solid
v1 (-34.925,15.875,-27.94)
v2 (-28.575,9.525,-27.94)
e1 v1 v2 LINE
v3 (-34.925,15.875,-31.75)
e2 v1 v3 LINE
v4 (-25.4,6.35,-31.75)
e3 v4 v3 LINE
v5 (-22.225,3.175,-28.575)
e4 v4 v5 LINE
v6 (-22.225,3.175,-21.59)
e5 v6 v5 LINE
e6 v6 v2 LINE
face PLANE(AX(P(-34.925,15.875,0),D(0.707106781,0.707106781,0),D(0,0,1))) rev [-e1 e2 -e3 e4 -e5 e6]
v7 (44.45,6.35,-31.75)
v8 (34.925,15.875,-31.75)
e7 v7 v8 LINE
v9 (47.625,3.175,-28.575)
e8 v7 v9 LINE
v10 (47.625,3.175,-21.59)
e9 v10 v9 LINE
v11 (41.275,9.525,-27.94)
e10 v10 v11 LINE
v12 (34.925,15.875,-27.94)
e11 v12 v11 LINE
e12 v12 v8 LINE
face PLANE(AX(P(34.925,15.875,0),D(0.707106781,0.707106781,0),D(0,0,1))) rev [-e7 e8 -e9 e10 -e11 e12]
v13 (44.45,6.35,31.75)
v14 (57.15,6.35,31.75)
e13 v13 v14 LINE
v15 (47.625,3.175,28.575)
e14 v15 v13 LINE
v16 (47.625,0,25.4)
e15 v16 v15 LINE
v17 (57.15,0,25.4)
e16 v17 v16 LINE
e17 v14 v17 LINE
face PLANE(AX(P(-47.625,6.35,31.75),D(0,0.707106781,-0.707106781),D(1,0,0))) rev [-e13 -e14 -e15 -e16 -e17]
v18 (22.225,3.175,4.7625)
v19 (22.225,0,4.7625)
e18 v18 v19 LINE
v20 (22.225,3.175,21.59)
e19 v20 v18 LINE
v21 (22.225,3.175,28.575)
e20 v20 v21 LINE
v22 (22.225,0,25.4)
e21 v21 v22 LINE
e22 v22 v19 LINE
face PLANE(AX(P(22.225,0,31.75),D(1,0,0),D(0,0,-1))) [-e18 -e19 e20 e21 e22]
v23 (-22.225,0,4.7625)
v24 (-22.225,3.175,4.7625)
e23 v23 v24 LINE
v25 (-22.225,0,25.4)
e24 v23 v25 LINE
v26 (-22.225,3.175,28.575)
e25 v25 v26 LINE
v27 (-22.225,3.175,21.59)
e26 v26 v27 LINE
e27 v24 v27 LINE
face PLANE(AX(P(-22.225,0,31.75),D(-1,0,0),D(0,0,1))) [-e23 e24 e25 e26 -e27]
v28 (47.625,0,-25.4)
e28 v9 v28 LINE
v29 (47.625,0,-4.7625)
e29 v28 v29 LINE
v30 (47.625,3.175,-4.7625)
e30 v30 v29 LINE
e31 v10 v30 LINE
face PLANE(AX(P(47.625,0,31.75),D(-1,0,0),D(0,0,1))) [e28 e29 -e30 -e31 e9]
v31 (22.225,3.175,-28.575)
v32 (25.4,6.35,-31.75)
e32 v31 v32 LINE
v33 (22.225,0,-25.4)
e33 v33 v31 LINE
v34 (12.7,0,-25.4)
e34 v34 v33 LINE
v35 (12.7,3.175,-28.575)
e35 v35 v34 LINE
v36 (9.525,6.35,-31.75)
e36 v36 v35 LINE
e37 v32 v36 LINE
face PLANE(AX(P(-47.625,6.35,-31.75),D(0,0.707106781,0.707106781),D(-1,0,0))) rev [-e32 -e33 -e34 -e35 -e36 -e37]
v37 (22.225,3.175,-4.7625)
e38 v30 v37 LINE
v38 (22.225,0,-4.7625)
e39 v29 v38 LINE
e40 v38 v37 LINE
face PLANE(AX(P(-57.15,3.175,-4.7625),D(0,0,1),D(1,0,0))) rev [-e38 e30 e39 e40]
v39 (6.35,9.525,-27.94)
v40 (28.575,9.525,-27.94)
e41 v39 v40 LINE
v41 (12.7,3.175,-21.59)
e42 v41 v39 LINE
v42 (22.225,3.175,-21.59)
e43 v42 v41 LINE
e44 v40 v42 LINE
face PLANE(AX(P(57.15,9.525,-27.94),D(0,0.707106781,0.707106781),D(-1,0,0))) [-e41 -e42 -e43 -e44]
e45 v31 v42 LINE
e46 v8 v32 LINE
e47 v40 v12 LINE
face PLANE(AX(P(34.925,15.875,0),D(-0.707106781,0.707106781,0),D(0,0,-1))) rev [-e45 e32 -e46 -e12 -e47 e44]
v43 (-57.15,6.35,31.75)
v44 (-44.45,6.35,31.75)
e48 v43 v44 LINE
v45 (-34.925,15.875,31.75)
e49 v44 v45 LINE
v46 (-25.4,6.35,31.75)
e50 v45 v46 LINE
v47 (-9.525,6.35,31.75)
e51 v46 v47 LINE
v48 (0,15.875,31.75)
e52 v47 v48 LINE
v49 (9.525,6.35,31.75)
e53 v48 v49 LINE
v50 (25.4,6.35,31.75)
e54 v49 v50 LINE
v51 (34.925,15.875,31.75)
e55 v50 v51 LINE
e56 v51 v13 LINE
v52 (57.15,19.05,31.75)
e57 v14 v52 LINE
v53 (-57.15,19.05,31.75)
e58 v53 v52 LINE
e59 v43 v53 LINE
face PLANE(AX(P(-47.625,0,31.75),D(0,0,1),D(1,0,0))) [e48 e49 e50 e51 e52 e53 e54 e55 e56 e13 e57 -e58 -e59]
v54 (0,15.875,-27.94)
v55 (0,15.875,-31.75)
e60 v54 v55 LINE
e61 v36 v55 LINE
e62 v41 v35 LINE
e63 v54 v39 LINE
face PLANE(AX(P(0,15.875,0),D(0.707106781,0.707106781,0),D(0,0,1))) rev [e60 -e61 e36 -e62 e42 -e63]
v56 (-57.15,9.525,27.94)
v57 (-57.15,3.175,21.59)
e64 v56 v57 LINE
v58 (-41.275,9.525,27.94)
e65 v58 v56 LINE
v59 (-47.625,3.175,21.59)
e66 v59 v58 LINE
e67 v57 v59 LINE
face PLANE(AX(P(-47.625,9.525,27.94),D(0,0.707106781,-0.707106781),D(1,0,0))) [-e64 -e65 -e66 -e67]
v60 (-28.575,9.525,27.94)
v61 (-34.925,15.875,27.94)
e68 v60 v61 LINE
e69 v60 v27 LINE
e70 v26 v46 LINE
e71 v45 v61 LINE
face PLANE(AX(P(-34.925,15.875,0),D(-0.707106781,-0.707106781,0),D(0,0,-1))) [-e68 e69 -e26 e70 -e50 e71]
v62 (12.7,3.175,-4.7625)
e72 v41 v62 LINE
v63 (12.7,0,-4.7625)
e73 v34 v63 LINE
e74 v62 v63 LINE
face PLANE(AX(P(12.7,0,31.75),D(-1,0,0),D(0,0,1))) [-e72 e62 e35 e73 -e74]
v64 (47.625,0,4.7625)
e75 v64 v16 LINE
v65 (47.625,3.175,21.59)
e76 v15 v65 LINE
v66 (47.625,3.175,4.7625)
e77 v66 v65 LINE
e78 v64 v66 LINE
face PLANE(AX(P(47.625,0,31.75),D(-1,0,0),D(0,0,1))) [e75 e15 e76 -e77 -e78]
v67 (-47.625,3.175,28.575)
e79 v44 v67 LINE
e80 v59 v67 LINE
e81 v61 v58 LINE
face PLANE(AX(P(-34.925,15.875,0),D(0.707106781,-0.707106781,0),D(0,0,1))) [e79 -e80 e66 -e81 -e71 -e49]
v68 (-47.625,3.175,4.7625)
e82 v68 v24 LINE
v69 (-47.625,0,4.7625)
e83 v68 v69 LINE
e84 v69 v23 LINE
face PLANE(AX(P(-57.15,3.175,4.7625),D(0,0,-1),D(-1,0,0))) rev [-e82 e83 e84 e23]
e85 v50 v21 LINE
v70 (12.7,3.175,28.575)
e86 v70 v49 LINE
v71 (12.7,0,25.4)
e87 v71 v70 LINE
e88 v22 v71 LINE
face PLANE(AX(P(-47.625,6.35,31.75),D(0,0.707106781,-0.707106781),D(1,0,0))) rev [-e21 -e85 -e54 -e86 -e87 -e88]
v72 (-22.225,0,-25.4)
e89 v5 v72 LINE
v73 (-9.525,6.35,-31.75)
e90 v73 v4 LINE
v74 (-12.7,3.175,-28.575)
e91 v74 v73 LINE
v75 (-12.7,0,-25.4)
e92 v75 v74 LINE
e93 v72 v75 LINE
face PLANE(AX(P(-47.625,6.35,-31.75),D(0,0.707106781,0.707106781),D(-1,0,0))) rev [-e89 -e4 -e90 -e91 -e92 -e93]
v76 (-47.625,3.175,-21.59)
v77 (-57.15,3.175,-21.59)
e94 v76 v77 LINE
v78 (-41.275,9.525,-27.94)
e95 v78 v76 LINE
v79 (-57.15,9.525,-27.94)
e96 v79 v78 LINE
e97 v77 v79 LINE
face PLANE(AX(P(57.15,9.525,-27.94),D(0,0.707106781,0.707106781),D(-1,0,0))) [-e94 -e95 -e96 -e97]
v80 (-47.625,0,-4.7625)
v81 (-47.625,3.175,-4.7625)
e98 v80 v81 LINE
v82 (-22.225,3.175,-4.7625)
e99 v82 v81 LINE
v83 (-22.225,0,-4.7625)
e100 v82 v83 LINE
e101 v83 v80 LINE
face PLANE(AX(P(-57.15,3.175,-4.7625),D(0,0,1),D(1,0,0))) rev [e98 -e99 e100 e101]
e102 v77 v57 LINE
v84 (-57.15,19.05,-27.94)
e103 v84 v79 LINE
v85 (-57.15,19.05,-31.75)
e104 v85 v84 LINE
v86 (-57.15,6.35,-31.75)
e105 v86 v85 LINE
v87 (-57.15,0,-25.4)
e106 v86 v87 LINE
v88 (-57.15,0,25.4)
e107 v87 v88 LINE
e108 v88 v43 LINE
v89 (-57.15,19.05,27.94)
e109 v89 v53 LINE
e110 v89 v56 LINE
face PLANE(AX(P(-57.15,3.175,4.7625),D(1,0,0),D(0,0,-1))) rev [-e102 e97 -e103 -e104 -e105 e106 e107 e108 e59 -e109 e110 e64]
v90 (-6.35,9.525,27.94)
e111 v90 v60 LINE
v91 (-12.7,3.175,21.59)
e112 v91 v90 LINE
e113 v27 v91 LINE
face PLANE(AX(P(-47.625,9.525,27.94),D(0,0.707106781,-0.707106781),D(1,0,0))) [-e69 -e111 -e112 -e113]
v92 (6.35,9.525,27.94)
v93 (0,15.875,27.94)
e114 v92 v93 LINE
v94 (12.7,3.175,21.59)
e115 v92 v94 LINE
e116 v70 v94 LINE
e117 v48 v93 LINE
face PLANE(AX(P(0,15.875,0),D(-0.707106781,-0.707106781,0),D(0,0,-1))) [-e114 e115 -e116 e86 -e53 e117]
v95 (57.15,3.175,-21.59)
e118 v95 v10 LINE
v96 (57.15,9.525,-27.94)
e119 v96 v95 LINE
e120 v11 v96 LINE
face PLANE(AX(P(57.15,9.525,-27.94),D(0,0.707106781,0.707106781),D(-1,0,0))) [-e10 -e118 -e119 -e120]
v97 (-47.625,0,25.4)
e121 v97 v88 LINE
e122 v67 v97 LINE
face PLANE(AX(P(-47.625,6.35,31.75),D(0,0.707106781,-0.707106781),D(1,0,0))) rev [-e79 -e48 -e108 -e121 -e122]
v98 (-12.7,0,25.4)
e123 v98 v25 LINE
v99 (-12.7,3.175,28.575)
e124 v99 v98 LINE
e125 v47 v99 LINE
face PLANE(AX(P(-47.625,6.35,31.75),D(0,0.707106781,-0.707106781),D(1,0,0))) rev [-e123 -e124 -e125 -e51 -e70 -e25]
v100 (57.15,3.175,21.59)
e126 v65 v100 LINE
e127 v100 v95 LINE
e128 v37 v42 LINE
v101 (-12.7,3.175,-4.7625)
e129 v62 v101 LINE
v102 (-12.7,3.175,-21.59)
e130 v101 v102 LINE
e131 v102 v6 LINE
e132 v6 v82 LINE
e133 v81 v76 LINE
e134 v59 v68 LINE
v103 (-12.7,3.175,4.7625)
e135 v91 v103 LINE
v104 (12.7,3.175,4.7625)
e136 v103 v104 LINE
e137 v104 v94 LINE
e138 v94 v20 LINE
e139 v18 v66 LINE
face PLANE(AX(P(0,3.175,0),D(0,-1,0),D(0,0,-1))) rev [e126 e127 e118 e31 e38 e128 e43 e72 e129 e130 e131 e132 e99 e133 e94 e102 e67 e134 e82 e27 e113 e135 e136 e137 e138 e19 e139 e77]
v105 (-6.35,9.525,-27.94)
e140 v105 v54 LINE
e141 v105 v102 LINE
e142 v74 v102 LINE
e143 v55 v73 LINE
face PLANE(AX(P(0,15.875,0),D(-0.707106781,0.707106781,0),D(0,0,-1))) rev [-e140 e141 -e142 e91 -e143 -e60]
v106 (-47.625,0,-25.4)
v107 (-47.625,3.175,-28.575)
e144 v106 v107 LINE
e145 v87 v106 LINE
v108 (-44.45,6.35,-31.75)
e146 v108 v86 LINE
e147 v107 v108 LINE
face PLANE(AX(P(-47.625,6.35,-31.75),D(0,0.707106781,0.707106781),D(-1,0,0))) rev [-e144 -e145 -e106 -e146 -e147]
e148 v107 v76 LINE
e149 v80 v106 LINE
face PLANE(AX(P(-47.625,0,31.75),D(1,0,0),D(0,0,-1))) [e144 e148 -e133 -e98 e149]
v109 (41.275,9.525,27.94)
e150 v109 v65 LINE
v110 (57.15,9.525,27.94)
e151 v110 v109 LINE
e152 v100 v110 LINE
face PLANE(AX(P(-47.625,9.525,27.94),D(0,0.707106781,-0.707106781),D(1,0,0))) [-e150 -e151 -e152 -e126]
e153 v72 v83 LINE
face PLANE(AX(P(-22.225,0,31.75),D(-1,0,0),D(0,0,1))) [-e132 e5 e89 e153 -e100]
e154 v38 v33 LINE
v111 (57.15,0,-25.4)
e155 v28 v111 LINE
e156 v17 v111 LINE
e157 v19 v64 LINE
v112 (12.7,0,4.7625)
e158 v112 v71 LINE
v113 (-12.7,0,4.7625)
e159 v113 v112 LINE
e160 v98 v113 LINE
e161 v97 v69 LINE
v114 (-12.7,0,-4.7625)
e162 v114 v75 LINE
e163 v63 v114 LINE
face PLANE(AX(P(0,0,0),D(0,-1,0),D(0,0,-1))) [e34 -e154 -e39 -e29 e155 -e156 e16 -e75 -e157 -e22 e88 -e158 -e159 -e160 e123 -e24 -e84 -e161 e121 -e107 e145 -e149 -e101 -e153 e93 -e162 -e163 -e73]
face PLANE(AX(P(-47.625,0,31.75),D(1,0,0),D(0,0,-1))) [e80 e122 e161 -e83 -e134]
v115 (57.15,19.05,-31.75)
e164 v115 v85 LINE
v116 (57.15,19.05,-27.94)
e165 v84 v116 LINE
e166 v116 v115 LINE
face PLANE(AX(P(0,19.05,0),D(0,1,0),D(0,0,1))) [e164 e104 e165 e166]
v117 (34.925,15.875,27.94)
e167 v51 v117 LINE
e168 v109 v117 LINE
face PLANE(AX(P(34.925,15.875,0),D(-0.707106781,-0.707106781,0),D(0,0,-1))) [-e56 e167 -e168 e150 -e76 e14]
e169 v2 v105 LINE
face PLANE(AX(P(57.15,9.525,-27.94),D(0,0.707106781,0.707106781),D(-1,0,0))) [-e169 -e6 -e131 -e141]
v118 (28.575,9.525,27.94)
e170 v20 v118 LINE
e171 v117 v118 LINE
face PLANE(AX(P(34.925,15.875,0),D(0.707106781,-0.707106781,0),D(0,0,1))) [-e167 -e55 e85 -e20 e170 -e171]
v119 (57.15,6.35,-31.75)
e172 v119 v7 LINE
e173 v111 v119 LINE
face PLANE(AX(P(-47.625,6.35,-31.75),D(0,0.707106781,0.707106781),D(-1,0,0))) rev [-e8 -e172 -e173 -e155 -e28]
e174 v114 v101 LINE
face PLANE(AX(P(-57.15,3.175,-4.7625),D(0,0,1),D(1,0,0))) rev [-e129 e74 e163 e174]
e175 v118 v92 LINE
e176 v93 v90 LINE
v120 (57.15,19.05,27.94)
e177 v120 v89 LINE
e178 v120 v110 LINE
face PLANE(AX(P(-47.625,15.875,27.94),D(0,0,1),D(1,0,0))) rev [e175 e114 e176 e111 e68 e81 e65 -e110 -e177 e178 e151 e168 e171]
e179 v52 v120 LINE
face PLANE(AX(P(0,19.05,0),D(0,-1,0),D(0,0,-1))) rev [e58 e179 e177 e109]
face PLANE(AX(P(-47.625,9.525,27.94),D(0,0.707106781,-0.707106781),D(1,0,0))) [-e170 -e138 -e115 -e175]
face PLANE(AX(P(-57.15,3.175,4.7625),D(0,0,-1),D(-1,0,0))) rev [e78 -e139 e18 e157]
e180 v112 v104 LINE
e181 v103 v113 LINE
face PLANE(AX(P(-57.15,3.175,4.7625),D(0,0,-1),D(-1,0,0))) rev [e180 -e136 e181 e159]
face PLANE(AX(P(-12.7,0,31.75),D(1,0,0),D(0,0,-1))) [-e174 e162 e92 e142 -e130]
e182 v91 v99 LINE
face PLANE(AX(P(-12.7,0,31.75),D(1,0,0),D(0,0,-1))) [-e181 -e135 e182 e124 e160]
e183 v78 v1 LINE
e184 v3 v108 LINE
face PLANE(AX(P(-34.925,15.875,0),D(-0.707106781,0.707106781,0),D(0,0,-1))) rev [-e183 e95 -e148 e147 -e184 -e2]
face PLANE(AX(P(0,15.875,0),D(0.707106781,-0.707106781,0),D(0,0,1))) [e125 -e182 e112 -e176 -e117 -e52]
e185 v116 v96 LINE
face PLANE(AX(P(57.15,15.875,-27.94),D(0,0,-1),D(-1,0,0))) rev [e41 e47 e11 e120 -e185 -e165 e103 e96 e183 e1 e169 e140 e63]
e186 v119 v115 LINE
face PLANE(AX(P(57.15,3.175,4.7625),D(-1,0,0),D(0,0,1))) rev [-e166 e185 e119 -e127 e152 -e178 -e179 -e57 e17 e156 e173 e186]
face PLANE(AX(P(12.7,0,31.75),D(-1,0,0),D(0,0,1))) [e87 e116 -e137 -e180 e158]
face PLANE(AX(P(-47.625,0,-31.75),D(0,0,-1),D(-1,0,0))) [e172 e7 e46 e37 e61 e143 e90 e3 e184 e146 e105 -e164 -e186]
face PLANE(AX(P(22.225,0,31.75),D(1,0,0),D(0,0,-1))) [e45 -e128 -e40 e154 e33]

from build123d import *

# Parameters (mm, degrees)
SKETCH1_W           = 114.3
SKETCH1_H           = 9.525
BOSS_EXTRUDE1_DEPTH = 3.175
SKETCH2_W           = 9.525
SKETCH2_H           = 63.5
BOSS_EXTRUDE2_DEPTH = 3.175
SKETCH3_W           = 9.525
SKETCH3_H           = 3.81
BOSS_EXTRUDE3_DEPTH = 12.7
SKETCH4_W           = 114.3
SKETCH4_H           = 3.81
BOSS_EXTRUDE4_DEPTH = 3.175
CHAMFER1_SIZE       = 12.7
CHAMFER2_SIZE       = 6.35


with BuildPart() as part:
    # Sketch1 → Boss-Extrude1 (new body)
    with BuildSketch(Plane(origin=(0, 0, 0), x_dir=(1, 0, 0), z_dir=(0, 1, 0))):
        Rectangle(SKETCH1_W, SKETCH1_H)
    extrude(amount=BOSS_EXTRUDE1_DEPTH)

    # Sketch2 → Boss-Extrude2 (add)
    with BuildSketch(Plane(origin=(0, 3.175, 0), x_dir=(1, 0, 0), z_dir=(0, 1, 0))):
        with Locations((-52.3875, 0)):
            Rectangle(SKETCH2_W, SKETCH2_H)
        with Locations((52.3875, 0)):
            Rectangle(SKETCH2_W, SKETCH2_H)
        with Locations((17.4625, 0)):
            Rectangle(SKETCH2_W, SKETCH2_H)
        with Locations((-17.4625, 0)):
            Rectangle(SKETCH2_W, SKETCH2_H)
    extrude(amount=-BOSS_EXTRUDE2_DEPTH)

    # Sketch3 → Boss-Extrude3 (add)
    with BuildSketch(Plane(origin=(0, 3.175, 0), x_dir=(1, 0, 0), z_dir=(0, 1, 0))):
        with Locations((-52.3875, -29.845)):
            Rectangle(SKETCH3_W, SKETCH3_H)
        with Locations((-17.4625, -29.845)):
            Rectangle(SKETCH3_W, SKETCH3_H)
        with Locations((17.4625, -29.845)):
            Rectangle(SKETCH3_W, SKETCH3_H)
        with Locations((52.3875, -29.845)):
            Rectangle(SKETCH3_W, SKETCH3_H)
        with Locations((52.3875, 29.845)):
            Rectangle(SKETCH3_W, SKETCH3_H)
        with Locations((17.4625, 29.845)):
            Rectangle(SKETCH3_W, SKETCH3_H)
        with Locations((-17.4625, 29.845)):
            Rectangle(SKETCH3_W, SKETCH3_H)
        with Locations((-52.3875, 29.845)):
            Rectangle(SKETCH3_W, SKETCH3_H)
    extrude(amount=BOSS_EXTRUDE3_DEPTH)

    # Sketch4 → Boss-Extrude4 (add)
    with BuildSketch(Plane(origin=(0, 15.875, 0), x_dir=(1, 0, 0), z_dir=(0, 1, 0))):
        with Locations((0, -29.845)):
            Rectangle(SKETCH4_W, SKETCH4_H)
        with Locations((0, 29.845)):
            Rectangle(SKETCH4_W, SKETCH4_H)
    extrude(amount=BOSS_EXTRUDE4_DEPTH)

    # Chamfer1
    chamfer1_edges = [part.edges().sort_by_distance(p)[0] for p in [
        (47.625, 15.875, -29.845),
        (22.225, 15.875, -29.845),
        (12.7, 15.875, -29.845),
        (-12.7, 15.875, -29.845),
        (-22.225, 15.875, -29.845),
        (-47.625, 15.875, -29.845),
        (47.625, 15.875, 29.845),
        (22.225, 15.875, 29.845),
        (12.7, 15.875, 29.845),
        (-12.7, 15.875, 29.845),
        (-22.225, 15.875, 29.845),
        (-47.625, 15.875, 29.845),
    ]]
    chamfer(chamfer1_edges, length=CHAMFER1_SIZE - 0.0001)  # a hair under: the kernel refuses the full size

    # Chamfer2
    chamfer2_edges = [part.edges().sort_by_distance(p)[0] for p in [
        (-52.3875, 3.175, -27.94),
        (-17.4625, 3.175, -27.94),
        (17.4625, 3.175, -27.94),
        (52.3875, 3.175, -27.94),
        (52.3875, 3.175, 27.94),
        (17.4625, 3.175, 27.94),
        (-17.4625, 3.175, 27.94),
        (-52.3875, 3.175, 27.94),
    ]]
    chamfer(chamfer2_edges, length=CHAMFER2_SIZE)
    chamfer2_2_edges = [part.edges().sort_by_distance(p)[0] for p in [
        (-52.3875, 0, -31.75),
        (-17.4625, 0, -31.75),
        (17.4625, 0, -31.75),
        (52.3875, 0, -31.75),
        (52.3875, 0, 31.75),
        (17.4625, 0, 31.75),
        (-17.4625, 0, 31.75),
        (-52.3875, 0, 31.75),
    ]]
    chamfer(chamfer2_2_edges, length=CHAMFER2_SIZE)


solid = part.part
